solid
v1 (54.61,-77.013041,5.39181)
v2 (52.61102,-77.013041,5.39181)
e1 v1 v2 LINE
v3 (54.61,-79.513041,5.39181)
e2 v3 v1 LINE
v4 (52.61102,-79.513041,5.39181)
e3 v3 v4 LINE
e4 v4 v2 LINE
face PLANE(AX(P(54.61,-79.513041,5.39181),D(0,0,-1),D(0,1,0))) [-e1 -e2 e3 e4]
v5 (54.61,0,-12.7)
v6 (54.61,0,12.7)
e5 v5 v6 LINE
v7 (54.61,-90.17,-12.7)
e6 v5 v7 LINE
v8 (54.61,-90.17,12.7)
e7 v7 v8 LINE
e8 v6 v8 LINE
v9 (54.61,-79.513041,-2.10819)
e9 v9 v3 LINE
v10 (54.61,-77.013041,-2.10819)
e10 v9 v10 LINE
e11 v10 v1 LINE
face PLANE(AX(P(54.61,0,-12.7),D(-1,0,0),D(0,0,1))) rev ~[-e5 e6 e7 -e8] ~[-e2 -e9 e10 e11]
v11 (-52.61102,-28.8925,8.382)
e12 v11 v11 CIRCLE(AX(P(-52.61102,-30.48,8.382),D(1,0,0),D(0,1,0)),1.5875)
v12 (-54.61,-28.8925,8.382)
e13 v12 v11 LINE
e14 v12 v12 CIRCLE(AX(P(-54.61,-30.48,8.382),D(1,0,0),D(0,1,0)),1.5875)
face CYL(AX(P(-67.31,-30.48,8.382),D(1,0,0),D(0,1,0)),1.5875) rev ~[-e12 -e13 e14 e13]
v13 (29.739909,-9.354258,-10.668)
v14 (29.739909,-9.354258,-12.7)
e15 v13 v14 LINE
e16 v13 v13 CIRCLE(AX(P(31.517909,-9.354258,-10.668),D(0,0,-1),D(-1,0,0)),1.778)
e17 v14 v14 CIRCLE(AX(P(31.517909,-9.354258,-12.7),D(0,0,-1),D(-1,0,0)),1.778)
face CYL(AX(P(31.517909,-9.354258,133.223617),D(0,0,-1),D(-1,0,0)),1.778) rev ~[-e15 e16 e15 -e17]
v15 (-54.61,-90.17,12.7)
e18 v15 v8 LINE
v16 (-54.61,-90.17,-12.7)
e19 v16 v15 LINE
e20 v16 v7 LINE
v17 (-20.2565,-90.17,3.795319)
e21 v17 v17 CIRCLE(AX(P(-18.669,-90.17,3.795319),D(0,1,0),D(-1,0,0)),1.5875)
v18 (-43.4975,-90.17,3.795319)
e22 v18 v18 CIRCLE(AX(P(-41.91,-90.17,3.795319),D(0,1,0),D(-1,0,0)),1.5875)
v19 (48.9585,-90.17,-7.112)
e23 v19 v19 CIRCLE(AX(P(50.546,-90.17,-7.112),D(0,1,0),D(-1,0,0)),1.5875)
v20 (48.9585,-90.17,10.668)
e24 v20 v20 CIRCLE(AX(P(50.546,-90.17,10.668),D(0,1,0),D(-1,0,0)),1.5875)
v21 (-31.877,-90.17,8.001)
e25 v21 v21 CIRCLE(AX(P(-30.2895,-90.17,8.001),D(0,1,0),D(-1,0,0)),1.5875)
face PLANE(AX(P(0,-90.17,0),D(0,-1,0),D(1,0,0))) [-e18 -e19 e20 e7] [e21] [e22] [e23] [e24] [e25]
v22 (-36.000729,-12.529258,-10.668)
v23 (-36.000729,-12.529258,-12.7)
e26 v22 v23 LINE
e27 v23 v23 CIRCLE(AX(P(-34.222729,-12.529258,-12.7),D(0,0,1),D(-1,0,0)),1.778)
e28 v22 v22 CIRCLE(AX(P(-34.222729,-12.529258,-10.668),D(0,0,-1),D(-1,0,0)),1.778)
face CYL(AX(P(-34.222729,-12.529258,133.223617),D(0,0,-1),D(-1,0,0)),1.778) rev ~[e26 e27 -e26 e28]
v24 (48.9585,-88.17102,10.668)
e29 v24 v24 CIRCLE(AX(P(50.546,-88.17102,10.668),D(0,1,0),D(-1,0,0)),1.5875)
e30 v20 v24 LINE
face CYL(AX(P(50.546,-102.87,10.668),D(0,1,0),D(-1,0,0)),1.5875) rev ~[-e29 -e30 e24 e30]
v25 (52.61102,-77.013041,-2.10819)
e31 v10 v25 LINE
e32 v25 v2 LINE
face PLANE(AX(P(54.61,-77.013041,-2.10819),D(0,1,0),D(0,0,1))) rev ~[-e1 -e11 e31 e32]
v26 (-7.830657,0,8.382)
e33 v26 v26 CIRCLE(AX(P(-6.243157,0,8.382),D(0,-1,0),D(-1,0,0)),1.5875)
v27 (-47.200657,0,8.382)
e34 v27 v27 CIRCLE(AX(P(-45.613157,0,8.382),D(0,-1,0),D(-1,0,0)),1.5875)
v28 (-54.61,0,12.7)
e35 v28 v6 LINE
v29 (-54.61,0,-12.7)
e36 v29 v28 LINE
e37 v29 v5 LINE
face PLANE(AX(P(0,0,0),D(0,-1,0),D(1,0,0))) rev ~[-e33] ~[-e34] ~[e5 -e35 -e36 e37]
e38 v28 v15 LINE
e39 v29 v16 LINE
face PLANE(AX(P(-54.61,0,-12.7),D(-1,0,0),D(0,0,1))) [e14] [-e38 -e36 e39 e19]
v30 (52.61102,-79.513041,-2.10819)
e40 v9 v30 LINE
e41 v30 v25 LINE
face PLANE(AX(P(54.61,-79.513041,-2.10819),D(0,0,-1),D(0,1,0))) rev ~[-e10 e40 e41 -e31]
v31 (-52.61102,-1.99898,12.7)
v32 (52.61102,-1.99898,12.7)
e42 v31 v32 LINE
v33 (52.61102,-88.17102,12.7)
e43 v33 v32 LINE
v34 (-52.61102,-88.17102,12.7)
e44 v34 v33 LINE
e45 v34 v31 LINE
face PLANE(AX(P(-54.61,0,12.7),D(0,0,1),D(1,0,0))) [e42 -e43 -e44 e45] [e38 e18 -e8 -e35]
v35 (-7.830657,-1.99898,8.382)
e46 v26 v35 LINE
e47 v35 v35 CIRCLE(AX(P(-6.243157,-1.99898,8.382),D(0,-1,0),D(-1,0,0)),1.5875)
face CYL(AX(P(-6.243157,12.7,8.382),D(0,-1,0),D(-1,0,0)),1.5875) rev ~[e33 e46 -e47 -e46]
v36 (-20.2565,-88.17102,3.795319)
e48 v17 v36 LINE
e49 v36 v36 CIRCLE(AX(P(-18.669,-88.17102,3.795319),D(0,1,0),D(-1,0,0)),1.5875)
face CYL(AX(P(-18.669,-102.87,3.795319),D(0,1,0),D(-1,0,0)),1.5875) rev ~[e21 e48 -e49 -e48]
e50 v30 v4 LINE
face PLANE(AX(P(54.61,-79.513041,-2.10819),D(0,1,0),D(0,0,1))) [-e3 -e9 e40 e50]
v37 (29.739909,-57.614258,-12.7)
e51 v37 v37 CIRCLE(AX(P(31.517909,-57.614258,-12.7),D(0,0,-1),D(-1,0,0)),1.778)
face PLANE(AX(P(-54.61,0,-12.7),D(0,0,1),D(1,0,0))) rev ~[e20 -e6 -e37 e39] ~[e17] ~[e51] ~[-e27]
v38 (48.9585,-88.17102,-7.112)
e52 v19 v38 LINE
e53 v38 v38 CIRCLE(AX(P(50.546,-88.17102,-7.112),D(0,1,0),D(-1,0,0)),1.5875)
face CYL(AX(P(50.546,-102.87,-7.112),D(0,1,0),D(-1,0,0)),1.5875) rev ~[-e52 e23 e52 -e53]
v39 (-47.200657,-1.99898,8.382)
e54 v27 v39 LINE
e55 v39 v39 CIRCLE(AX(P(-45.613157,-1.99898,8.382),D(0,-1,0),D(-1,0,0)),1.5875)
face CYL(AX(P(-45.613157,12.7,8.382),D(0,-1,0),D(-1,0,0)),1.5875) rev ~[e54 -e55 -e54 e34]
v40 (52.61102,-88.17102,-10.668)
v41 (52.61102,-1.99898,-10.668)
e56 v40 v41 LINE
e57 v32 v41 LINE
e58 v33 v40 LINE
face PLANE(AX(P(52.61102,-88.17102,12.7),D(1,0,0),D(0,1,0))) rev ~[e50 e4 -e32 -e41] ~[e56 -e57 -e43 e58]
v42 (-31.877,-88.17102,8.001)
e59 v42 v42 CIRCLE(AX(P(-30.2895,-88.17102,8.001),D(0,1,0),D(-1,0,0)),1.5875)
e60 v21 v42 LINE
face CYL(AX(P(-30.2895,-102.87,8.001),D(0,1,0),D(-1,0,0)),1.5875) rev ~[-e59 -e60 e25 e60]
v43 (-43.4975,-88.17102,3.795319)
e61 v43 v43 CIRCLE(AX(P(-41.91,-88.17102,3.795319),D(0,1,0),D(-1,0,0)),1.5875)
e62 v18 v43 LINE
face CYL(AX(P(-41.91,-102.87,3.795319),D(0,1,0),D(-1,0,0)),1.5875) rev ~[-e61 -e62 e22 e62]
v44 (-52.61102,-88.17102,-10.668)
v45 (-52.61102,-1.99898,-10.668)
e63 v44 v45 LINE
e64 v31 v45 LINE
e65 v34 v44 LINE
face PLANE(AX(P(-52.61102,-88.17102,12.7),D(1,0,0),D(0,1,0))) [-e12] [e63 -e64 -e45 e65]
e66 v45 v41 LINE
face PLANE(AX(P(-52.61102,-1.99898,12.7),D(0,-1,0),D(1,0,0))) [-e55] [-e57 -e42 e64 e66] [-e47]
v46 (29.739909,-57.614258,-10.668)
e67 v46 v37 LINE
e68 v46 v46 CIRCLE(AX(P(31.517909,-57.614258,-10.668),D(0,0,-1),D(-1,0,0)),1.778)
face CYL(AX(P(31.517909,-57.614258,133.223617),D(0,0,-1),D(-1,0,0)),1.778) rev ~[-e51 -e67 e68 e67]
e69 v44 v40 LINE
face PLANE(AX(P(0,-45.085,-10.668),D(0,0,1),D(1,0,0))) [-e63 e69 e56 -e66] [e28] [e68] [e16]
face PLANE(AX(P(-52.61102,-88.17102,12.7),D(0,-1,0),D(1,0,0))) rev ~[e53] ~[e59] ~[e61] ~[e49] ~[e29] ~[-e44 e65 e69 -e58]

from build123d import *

# Parameters (mm, degrees)
F0_W      = 109.22
F0_H      = 25.4
F1_DEPTH  = 90.17
F2_W      = 105.22204
F2_H      = 86.17204
F3_DEPTH  = 23.368
F6_D      = 3.556
F10_R     = 2.7904831324
F11_DEPTH = 25.4
F13_D     = 3.175
F13_DEPTH = 12.7
F13_TIP   = 0.9538662327
F14_W     = 2.5
F14_H     = 7.5
F15_DEPTH = 5.08
F17_D     = 3.175
F17_DEPTH = 12.7
F17_TIP   = 0.9538662327
F19_D     = 3.175
F19_DEPTH = 12.7
F19_TIP   = 0.9538662327
F21_D     = 3.175
F21_DEPTH = 12.7
F21_TIP   = 0.9538662327


# Not quite as in the source:
# - a feature of the source that left no trace in its solid (it failed there, or was rolled back) is left out
# - a feature names something its author has since deleted; it is built from what else it names


with BuildPart() as f1:
    # F0 (on Front) → F1 (new body)
    with BuildSketch(Plane.XZ):
        Rectangle(F0_W, F0_H)
    extrude(amount=F1_DEPTH)

    # F2 (on face) → F3 (cut)
    with BuildSketch(Plane.XY.offset(12.7)):
        with Locations((0, -45.085)):
            Rectangle(F2_W, F2_H)
    extrude(amount=-F3_DEPTH, mode=Mode.SUBTRACT)

    # F6 (through all)
    with Locations(Plane.XY.offset(-10.668)):
        with Locations((-34.2227290702, -12.5292580739), (31.5179094365, -9.3542580739), (31.5179094365, -57.6142580739)):
            Hole(F6_D / 2)

    # F10 (on face) → F11 (cut)
    with BuildSketch(Plane(origin=(0, 0, -12.7), x_dir=(1, 0, 0), z_dir=(0, 0, -1))):
        with Locations((-37.1684581041, 13.9195527881)):
            Circle(F10_R)
    extrude(amount=F11_DEPTH, mode=Mode.SUBTRACT)

    # F13
    with Locations(Plane.XZ.offset(90.17)):
        with Locations((50.546, 10.668), (50.546, -7.112)):
            Hole(F13_D / 2, depth=F13_DEPTH)
            with Locations((0, 0, -(F13_DEPTH + F13_TIP / 2))):  # 118° drill point
                Cone(0, F13_D / 2, F13_TIP, mode=Mode.SUBTRACT)

    # F14 (on face) → F15 (cut)
    with BuildSketch(Plane.YZ.offset(54.61)):
        with Locations((-78.2630409374, 1.6418104)):
            Rectangle(F14_W, F14_H)
    extrude(amount=-F15_DEPTH, mode=Mode.SUBTRACT)

    # F17
    with Locations(Plane(origin=(0, 0, 0), x_dir=(1, 0, 0), z_dir=(0, 1, 0))):
        with Locations((-6.2431572373, -8.382), (-45.6131572373, -8.382)):
            Hole(F17_D / 2, depth=F17_DEPTH)
            with Locations((0, 0, -(F17_DEPTH + F17_TIP / 2))):  # 118° drill point
                Cone(0, F17_D / 2, F17_TIP, mode=Mode.SUBTRACT)

    # F19
    with Locations(Plane(origin=(-54.61, 0, 0), x_dir=(0, -1, 0), z_dir=(-1, 0, 0))):
        with Locations((30.48, 8.382)):
            Hole(F19_D / 2, depth=F19_DEPTH)
            with Locations((0, 0, -(F19_DEPTH + F19_TIP / 2))):  # 118° drill point
                Cone(0, F19_D / 2, F19_TIP, mode=Mode.SUBTRACT)

    # F21
    with Locations(Plane.XZ.offset(90.17)):
        with Locations((-30.2895, 8.001), (-41.91, 3.7953188), (-18.669, 3.7953188)):
            Hole(F21_D / 2, depth=F21_DEPTH)
            with Locations((0, 0, -(F21_DEPTH + F21_TIP / 2))):  # 118° drill point
                Cone(0, F21_D / 2, F21_TIP, mode=Mode.SUBTRACT)


solid = f1.part
